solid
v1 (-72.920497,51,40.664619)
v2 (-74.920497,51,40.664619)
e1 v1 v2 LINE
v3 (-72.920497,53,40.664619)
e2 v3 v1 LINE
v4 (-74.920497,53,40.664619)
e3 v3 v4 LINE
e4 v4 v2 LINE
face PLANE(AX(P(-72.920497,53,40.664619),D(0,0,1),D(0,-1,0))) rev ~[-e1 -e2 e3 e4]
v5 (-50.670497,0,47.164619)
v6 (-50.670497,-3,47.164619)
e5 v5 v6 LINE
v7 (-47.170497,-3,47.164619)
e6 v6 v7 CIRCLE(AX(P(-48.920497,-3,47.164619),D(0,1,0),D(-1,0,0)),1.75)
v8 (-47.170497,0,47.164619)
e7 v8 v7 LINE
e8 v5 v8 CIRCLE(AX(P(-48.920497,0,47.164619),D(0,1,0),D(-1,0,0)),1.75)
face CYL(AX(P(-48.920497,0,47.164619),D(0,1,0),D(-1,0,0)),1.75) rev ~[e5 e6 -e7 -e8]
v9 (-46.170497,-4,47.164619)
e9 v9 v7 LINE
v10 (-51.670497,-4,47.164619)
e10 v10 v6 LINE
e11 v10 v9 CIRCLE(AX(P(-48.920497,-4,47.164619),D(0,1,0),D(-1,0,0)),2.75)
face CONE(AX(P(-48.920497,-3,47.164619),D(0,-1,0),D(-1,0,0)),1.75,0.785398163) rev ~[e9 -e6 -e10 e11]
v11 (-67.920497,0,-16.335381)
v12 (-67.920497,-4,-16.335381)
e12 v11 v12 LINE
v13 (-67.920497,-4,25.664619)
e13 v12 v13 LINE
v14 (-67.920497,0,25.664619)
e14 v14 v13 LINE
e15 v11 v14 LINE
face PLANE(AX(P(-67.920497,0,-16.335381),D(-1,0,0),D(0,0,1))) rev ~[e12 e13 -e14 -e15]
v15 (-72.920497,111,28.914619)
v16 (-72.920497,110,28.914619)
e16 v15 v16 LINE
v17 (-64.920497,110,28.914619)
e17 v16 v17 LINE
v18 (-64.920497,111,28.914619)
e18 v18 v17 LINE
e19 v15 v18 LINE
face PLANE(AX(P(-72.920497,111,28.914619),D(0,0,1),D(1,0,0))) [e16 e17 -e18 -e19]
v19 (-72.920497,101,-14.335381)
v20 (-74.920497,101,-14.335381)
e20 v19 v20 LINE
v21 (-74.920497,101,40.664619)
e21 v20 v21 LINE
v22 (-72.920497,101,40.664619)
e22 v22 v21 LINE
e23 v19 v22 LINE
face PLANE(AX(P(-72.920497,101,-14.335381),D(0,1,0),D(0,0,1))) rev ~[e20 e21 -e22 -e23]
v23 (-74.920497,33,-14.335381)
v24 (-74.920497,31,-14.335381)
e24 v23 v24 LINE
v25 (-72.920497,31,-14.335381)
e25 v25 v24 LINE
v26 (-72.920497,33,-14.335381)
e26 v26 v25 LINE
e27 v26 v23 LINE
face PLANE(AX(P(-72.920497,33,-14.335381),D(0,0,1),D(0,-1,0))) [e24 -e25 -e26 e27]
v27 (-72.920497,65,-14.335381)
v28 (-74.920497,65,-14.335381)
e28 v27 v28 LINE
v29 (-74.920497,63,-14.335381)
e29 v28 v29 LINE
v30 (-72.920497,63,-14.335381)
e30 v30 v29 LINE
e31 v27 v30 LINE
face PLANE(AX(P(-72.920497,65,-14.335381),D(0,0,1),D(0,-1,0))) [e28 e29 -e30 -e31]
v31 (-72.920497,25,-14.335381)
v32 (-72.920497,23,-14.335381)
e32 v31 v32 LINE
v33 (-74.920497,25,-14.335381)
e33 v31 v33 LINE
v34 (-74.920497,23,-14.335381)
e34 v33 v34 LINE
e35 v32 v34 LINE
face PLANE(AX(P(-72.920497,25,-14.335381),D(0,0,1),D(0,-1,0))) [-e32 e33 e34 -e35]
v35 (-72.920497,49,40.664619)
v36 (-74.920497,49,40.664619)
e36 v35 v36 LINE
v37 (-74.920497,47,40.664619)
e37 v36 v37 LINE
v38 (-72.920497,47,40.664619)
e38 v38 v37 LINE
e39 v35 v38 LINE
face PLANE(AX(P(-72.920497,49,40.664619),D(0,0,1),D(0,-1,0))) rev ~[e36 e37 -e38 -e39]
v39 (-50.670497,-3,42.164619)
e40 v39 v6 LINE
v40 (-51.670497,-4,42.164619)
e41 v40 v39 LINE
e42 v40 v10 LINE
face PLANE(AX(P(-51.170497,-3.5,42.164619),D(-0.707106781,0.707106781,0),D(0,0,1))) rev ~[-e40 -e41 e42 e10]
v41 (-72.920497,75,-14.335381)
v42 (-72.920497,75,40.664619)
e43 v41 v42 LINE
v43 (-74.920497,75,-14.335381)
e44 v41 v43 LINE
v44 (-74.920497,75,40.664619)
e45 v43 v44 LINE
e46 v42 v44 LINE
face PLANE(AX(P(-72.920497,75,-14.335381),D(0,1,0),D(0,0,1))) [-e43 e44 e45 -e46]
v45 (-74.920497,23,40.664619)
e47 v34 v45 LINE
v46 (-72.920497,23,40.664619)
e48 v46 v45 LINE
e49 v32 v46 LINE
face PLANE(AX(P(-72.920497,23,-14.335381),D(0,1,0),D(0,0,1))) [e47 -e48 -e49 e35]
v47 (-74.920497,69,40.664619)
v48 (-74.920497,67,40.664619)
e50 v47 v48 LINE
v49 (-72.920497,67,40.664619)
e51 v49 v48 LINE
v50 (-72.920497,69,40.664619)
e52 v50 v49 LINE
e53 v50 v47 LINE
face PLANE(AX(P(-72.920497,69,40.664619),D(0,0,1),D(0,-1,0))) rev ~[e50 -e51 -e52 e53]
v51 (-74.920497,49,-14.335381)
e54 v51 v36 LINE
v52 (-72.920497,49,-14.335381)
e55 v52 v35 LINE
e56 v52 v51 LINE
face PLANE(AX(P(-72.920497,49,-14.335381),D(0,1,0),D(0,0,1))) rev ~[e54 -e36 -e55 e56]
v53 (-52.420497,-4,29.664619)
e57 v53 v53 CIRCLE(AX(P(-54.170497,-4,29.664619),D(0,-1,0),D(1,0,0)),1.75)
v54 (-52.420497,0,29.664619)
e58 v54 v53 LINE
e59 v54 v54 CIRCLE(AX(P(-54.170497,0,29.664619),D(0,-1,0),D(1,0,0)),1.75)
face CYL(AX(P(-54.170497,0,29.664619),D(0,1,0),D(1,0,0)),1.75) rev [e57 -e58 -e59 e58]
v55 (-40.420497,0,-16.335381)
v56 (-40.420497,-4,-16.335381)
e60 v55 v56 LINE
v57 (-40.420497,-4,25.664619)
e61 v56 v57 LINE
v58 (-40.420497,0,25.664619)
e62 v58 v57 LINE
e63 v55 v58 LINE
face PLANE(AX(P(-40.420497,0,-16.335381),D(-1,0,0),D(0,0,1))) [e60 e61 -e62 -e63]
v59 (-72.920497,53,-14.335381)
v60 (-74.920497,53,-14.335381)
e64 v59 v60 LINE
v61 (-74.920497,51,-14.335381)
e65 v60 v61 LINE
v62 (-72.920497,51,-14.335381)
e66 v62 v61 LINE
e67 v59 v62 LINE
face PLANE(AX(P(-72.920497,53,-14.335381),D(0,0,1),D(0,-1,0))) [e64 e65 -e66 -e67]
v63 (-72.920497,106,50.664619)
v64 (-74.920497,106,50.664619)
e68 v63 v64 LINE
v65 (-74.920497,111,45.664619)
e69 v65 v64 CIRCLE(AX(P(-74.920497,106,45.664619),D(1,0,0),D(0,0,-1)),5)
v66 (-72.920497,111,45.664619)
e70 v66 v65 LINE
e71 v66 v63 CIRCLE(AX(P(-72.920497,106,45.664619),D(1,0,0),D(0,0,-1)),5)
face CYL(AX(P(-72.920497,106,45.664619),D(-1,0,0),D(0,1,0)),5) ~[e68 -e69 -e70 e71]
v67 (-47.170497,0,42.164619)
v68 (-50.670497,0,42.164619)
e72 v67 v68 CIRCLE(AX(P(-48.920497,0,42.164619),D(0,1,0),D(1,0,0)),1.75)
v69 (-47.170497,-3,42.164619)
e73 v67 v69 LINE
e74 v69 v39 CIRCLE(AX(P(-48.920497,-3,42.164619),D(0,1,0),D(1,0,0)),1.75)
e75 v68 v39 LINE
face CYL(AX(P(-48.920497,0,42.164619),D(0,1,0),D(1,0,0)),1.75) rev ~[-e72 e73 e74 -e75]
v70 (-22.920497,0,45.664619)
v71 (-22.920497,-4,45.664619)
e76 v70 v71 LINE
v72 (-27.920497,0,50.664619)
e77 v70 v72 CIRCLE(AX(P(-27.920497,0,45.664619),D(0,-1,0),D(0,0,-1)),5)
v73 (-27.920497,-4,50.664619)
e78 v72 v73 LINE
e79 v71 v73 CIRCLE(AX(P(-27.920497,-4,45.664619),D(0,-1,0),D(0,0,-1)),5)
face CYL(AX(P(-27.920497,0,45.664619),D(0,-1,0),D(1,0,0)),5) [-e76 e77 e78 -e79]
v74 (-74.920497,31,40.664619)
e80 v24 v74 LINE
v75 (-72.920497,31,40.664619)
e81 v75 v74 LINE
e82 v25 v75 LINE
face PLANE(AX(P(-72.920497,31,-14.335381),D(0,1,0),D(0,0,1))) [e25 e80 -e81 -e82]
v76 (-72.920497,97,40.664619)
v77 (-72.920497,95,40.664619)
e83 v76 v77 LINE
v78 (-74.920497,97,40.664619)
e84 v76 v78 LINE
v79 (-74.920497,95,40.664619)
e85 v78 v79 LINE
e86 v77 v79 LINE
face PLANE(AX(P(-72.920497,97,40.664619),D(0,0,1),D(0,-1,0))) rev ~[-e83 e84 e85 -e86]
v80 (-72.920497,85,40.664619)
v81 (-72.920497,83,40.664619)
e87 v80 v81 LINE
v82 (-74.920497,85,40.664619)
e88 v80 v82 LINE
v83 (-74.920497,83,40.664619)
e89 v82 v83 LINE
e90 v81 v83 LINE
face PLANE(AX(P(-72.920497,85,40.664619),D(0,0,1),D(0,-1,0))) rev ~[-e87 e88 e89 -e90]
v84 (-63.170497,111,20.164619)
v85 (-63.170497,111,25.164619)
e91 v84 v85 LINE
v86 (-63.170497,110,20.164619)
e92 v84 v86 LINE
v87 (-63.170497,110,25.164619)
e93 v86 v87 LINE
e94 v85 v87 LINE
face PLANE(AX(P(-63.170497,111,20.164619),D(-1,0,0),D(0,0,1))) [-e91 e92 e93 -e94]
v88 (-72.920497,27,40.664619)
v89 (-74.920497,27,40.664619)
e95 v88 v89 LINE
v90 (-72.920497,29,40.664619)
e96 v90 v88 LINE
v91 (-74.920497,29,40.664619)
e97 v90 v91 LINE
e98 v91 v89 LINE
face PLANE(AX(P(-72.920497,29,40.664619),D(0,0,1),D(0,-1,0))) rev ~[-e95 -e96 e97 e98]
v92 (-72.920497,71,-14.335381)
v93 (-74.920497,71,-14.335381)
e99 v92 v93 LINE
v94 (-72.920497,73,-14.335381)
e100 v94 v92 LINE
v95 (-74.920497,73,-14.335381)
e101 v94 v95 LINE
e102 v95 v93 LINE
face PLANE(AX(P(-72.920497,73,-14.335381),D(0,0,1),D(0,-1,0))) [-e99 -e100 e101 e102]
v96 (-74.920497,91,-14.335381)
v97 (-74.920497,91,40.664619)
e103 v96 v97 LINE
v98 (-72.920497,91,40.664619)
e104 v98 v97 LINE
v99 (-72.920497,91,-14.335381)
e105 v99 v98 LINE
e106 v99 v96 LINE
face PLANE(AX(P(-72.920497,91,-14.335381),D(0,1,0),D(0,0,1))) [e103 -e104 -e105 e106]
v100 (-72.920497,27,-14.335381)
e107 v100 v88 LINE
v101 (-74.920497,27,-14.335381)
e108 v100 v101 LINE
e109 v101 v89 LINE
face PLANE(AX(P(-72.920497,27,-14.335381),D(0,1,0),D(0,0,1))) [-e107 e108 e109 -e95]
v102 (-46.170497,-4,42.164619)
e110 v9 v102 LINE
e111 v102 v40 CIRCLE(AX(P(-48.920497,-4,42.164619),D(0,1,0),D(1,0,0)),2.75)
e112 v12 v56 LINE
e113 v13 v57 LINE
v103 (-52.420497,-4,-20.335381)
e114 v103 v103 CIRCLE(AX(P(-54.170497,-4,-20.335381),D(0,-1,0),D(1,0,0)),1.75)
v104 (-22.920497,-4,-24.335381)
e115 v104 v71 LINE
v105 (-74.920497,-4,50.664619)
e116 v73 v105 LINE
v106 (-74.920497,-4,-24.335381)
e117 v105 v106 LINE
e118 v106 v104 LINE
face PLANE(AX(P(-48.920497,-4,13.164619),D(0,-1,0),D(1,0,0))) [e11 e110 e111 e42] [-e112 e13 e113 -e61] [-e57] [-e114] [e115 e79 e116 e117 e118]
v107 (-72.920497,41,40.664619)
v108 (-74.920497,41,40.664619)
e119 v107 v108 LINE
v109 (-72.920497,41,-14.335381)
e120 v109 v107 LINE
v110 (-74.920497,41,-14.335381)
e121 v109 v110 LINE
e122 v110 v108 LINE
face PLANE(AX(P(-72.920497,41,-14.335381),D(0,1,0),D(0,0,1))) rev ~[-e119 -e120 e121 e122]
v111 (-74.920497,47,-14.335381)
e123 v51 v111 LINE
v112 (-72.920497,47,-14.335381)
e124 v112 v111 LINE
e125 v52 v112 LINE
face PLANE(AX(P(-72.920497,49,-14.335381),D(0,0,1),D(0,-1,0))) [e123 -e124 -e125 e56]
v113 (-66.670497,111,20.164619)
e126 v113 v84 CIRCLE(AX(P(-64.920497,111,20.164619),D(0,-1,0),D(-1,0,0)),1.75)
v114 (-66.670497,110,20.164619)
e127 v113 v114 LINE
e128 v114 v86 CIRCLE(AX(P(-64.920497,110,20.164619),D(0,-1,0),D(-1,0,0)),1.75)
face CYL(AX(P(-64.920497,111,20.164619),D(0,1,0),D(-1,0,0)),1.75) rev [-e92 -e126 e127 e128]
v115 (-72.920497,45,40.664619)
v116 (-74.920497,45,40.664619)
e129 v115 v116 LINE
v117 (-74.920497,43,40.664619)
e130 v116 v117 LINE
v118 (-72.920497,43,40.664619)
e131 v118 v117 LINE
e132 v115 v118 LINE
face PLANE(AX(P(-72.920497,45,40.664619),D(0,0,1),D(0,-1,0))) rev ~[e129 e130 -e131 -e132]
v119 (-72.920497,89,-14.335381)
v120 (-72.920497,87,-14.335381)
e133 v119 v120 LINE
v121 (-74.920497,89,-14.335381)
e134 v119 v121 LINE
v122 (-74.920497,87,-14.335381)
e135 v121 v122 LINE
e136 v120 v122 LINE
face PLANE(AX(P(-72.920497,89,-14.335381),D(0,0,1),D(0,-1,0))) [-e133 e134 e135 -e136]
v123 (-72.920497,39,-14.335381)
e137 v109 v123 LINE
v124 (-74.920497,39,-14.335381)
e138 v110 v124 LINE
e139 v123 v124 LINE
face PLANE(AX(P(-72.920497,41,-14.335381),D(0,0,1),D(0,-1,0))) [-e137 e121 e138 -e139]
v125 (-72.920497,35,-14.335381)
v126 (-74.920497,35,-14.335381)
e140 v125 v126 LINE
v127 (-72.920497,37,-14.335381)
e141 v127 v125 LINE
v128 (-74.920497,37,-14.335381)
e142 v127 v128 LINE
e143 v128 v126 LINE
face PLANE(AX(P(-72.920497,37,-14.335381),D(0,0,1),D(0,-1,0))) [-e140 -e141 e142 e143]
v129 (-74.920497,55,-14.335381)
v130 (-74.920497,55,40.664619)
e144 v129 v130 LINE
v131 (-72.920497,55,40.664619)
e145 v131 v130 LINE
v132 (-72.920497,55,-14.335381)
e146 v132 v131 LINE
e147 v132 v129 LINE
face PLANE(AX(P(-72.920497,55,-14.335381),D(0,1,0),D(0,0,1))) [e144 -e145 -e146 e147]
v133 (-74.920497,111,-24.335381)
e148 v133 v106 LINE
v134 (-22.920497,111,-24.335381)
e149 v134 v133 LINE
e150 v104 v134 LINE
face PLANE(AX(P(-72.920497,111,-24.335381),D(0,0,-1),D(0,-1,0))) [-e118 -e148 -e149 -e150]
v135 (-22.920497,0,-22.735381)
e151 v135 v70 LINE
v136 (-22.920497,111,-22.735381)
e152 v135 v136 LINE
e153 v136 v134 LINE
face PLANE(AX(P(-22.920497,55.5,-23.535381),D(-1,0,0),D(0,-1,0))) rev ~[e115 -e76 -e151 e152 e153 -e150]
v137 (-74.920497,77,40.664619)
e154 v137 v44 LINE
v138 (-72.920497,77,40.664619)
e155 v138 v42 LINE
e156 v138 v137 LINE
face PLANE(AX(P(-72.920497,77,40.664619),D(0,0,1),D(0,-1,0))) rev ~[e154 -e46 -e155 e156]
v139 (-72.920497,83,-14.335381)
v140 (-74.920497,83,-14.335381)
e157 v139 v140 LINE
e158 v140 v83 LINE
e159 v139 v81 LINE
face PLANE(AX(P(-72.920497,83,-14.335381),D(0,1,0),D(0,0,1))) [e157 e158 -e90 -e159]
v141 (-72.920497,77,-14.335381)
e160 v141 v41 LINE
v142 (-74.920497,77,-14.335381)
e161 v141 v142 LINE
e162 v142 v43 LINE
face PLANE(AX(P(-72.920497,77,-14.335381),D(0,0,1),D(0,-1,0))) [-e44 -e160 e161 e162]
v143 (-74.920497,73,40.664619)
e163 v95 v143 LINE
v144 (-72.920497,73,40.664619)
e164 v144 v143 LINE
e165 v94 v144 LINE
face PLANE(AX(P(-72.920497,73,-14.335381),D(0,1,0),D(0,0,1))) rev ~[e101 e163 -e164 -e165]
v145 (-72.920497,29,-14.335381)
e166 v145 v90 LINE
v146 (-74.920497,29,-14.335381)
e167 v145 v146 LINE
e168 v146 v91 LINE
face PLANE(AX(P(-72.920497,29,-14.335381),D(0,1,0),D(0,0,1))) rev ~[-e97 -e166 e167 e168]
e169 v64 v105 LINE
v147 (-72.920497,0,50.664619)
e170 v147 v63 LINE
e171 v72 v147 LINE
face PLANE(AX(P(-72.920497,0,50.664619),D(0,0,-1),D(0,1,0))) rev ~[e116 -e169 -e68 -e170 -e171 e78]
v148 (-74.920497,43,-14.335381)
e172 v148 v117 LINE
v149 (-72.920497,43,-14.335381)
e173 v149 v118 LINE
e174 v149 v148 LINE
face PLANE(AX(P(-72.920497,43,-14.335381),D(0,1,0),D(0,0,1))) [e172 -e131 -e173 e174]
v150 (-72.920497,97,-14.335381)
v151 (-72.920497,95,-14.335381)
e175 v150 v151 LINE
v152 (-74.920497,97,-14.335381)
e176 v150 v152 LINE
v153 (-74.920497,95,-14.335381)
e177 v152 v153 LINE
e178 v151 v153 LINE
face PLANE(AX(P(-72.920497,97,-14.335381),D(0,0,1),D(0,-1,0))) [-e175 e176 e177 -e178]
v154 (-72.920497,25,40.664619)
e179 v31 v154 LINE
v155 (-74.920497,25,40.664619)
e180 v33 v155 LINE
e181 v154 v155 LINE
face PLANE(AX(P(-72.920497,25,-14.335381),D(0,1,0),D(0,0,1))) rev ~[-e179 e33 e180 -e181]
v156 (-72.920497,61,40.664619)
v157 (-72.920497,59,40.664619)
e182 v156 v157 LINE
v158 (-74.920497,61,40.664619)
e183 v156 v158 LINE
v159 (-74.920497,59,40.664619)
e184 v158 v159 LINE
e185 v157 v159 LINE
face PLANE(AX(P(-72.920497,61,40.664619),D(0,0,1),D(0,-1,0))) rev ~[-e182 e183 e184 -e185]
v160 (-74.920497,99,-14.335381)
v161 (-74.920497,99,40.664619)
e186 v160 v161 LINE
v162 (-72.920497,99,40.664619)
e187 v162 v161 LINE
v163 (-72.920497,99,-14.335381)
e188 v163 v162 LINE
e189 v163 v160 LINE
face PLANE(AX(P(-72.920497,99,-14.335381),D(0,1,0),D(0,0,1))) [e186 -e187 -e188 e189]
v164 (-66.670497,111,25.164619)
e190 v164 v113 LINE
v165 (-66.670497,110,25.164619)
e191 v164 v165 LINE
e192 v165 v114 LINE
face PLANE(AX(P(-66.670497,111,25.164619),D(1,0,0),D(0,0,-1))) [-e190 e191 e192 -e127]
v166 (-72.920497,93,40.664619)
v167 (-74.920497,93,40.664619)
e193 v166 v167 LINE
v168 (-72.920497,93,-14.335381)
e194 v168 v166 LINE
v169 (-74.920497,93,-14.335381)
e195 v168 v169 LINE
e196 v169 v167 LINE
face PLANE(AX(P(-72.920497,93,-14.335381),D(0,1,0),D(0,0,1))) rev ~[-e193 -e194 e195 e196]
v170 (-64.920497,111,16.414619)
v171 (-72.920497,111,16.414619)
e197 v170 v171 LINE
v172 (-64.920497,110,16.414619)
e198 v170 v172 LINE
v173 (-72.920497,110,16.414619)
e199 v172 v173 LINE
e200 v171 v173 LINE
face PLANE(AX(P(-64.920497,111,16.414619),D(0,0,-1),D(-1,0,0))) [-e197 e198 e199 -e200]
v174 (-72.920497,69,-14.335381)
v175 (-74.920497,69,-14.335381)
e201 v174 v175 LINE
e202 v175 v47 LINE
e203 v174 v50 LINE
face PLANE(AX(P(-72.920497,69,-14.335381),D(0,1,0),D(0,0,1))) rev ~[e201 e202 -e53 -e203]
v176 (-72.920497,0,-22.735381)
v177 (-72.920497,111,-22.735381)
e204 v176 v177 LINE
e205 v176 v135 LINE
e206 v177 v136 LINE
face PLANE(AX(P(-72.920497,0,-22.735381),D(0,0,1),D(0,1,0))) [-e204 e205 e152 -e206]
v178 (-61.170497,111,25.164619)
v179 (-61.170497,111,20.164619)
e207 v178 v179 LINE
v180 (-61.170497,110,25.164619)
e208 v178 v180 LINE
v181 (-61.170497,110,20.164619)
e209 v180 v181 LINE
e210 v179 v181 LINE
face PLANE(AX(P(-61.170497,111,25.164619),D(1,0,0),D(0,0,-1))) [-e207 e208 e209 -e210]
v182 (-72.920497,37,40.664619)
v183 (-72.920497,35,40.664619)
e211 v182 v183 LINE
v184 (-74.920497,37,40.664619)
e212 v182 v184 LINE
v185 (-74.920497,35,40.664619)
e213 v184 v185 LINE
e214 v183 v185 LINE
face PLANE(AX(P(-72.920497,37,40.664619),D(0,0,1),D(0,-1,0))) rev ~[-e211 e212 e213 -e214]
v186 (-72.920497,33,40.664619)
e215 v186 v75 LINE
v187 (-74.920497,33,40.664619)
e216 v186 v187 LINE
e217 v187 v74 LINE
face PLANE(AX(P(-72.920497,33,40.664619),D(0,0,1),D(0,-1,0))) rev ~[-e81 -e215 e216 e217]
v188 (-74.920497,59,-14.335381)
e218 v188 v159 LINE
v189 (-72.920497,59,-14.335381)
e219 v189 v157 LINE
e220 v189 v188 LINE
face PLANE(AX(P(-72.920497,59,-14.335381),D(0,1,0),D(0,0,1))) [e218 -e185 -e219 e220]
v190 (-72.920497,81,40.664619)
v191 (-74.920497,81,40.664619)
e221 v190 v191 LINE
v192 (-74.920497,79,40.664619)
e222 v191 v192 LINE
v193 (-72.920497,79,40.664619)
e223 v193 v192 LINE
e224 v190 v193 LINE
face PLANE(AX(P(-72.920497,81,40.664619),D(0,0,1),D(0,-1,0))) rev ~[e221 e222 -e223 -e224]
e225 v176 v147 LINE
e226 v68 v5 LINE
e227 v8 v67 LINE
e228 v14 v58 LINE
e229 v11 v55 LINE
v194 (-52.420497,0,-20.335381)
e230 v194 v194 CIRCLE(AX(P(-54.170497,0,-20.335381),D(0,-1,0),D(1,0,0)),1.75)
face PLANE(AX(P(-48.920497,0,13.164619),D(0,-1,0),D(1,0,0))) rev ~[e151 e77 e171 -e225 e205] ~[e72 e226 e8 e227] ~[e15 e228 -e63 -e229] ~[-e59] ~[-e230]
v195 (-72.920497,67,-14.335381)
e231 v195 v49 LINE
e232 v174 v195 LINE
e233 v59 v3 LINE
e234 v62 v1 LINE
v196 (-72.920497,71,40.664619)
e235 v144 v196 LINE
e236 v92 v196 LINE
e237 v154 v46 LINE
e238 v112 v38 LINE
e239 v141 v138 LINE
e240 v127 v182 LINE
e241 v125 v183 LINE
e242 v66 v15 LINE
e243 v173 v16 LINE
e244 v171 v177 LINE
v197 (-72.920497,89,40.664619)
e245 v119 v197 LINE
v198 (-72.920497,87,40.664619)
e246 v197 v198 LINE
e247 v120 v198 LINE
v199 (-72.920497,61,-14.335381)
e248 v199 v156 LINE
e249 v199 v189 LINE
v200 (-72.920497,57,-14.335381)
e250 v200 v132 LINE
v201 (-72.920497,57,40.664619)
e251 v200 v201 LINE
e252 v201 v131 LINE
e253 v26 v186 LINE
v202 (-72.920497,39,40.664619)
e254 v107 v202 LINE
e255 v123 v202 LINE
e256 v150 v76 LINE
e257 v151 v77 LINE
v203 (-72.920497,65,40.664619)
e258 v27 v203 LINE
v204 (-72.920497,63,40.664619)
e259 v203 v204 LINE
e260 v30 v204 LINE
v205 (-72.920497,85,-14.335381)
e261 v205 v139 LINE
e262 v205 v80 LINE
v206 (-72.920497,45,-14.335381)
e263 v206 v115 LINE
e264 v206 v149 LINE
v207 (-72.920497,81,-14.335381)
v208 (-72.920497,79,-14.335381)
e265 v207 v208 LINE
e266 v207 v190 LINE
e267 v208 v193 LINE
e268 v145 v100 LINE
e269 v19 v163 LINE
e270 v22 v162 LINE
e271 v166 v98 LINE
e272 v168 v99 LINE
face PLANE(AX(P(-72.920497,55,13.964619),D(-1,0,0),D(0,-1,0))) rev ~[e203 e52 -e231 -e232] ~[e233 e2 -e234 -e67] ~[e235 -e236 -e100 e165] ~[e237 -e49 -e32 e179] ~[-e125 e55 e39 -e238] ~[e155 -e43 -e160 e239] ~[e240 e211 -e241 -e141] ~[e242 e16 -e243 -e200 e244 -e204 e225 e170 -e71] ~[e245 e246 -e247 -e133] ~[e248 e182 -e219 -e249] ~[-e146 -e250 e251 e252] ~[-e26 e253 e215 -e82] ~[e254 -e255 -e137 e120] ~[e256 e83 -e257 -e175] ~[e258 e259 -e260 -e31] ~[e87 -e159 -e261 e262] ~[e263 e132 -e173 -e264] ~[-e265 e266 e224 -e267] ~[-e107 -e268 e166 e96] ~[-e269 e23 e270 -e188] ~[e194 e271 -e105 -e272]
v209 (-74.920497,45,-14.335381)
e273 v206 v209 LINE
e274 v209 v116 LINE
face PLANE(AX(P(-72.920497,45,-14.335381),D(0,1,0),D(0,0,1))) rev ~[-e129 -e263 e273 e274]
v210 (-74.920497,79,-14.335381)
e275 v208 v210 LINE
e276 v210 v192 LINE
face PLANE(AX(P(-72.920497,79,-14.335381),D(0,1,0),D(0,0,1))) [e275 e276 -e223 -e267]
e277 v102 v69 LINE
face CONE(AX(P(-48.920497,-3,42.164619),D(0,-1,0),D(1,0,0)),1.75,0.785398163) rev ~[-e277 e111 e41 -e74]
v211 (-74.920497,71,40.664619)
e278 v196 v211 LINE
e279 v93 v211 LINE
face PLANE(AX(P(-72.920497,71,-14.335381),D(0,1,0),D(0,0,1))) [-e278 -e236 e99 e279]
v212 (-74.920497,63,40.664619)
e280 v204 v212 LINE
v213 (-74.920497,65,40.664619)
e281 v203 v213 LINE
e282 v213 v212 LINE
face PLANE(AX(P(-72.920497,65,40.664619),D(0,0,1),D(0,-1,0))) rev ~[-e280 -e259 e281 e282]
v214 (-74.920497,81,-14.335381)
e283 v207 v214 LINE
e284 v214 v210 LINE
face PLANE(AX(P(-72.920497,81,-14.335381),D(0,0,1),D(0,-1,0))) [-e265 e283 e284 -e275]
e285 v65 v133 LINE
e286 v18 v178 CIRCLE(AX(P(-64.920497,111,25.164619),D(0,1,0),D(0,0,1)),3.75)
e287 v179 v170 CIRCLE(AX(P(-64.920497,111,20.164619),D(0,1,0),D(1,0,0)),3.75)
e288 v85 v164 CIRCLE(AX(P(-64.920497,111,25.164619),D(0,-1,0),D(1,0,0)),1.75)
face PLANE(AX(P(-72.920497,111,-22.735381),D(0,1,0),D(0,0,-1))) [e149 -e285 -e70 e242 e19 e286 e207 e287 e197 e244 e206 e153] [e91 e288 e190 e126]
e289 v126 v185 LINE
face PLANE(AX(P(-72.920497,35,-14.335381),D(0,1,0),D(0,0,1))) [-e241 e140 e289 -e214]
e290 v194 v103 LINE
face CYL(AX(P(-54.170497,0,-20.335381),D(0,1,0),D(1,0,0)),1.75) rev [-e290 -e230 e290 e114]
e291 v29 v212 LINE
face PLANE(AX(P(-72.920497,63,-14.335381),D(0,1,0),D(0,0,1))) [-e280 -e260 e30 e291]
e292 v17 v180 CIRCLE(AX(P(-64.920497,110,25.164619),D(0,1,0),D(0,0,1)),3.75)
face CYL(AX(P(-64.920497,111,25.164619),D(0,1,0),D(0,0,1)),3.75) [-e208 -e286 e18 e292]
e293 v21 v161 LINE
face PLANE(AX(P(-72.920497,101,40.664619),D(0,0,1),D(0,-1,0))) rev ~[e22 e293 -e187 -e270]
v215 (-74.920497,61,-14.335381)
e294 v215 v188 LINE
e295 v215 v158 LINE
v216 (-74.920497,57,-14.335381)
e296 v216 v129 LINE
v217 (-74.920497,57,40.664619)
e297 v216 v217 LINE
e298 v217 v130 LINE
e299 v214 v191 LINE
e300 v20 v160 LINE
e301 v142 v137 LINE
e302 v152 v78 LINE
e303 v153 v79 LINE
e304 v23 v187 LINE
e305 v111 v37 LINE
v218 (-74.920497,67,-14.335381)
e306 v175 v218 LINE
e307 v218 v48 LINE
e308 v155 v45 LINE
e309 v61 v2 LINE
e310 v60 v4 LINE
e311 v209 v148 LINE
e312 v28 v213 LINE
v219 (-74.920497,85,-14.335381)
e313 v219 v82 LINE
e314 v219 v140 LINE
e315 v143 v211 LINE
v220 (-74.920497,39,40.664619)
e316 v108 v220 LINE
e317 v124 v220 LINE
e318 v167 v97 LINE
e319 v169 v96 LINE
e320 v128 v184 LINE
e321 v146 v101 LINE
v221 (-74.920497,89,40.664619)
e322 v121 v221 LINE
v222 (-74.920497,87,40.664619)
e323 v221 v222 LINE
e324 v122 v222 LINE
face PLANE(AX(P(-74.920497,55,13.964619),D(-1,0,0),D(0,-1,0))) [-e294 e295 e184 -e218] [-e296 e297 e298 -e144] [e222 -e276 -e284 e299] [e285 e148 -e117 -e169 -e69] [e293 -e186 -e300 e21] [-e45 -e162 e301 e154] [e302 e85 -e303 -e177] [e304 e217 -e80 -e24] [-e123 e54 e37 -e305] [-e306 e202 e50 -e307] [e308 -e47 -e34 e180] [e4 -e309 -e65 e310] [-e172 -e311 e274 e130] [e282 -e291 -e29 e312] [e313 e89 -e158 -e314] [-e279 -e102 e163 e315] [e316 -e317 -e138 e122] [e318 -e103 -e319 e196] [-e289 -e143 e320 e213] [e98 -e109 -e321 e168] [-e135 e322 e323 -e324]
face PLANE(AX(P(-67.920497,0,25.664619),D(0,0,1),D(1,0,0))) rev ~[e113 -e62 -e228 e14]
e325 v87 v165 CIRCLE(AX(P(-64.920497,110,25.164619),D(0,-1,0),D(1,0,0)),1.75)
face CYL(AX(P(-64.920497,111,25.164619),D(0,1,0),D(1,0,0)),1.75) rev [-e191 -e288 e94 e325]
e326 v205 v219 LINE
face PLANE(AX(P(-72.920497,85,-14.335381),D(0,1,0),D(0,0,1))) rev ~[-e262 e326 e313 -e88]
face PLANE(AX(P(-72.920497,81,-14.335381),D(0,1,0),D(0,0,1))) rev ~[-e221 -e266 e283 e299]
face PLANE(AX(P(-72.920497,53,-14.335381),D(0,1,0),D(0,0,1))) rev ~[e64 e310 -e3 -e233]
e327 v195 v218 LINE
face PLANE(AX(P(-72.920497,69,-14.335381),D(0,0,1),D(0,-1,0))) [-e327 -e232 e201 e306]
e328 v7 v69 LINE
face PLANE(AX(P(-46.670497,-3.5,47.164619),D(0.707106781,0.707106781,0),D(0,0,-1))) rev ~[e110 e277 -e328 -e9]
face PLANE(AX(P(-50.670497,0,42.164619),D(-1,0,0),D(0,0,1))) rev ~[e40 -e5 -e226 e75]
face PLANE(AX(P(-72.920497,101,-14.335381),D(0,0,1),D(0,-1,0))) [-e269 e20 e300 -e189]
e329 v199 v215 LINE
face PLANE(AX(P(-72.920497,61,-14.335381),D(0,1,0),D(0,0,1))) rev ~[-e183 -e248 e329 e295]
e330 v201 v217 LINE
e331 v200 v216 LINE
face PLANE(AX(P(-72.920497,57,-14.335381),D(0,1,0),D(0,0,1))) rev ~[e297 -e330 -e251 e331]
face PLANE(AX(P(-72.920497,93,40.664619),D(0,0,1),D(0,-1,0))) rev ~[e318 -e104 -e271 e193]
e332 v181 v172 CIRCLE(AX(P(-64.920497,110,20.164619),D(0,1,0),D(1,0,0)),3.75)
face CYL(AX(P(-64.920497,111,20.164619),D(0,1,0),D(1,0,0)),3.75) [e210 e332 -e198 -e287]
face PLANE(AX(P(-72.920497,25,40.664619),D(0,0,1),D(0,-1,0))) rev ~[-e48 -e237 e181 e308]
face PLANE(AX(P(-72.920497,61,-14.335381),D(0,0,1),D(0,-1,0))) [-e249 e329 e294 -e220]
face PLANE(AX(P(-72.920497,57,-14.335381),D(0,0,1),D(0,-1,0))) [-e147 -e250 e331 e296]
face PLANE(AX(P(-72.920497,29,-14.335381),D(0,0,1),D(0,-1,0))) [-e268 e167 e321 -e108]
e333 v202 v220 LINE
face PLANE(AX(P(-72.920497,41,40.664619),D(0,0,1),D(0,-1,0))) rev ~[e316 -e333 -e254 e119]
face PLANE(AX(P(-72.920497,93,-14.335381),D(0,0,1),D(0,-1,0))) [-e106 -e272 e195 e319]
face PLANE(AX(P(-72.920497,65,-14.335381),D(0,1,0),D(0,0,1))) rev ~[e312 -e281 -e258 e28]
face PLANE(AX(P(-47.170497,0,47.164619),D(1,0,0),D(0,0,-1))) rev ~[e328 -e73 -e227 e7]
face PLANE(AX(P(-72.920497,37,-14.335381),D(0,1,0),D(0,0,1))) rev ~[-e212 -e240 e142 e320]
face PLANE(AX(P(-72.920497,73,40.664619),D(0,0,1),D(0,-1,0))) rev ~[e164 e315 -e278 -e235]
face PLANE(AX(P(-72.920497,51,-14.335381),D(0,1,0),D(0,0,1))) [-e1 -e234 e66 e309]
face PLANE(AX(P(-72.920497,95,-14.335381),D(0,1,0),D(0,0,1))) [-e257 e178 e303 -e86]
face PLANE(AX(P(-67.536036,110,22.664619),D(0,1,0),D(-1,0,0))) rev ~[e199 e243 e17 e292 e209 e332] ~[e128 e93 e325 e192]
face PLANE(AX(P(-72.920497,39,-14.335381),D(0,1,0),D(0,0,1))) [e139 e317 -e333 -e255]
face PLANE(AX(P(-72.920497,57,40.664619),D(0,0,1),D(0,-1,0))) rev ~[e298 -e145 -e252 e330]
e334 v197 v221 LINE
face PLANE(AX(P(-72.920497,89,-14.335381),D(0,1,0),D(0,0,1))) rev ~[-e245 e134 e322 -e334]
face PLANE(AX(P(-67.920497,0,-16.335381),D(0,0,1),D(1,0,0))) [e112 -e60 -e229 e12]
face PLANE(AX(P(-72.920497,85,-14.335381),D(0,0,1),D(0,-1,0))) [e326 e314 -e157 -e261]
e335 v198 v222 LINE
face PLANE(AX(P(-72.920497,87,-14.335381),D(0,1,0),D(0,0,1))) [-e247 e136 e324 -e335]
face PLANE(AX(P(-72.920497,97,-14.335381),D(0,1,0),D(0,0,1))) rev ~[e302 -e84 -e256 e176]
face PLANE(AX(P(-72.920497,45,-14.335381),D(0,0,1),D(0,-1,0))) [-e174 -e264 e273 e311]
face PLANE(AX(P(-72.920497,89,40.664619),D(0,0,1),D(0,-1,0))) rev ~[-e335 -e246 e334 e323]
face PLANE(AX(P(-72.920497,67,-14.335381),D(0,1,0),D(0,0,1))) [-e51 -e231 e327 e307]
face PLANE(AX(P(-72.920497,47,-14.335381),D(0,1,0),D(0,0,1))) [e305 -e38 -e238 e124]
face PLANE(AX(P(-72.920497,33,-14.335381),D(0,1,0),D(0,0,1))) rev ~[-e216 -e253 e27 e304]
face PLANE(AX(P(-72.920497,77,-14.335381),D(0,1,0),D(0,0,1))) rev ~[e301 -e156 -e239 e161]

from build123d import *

# Parameters (mm, degrees)
F0_R     = 1.75
F0_W     = 27.5
F0_H     = 42
F1_DEPTH = 4
F3_W     = 110
F3_H     = 73.4
F3_W_2   = 2
F3_H_2   = 55
F3_W_3   = 1
F4_DEPTH = 2
F5_SIZE  = 1
F6_DEPTH = 50
F9_DEPTH = 1
F10_R    = 5


# Not quite as in the source:
# - a feature names something its author has since deleted; it is built from what else it names


with BuildPart() as f1:
    # F0 (on Front) → F1 (new body)
    with BuildSketch(Plane.XZ):
        Polygon((-22.9204972982, 50.6646189876), (-72.9204972982, 50.6646189876), (-74.9204972982, 50.6646189876), (-74.9204972982, -24.3353810124), (-72.9204972982, -24.3353810124), (-22.9204972982, -24.3353810124), align=None)
        with Locations((-54.1704972982, -20.3353810124)):
            Circle(F0_R, mode=Mode.SUBTRACT)
        with Locations((-54.1704972982, 4.6646189876)):
            Rectangle(F0_W, F0_H, mode=Mode.SUBTRACT)
        with Locations((-54.1704972982, 29.6646189876)):
            Circle(F0_R, mode=Mode.SUBTRACT)
        with BuildLine():
            Line((-50.6704972982, 42.1646189876), (-50.6704972982, 47.1646189876))
            ThreePointArc((-50.6704972982, 47.1646189876), (-48.9204972982, 48.9146189876), (-47.1704972982, 47.1646189876))
            Line((-47.1704972982, 47.1646189876), (-47.1704972982, 42.1646189876))
            ThreePointArc((-47.1704972982, 42.1646189876), (-48.9204972982, 40.4146189876), (-50.6704972982, 42.1646189876))
        make_face(mode=Mode.SUBTRACT)
    extrude(amount=F1_DEPTH)

    # F3 (on line) → F4 (join, through all)
    with BuildSketch(Plane(origin=(-72.9204972982, 0, 0), x_dir=(0, -1, 0), z_dir=(-1, 0, 0))):
        with Locations((-55, 13.9646189876)):
            Rectangle(F3_W, F3_H)
        with Locations((-100, 13.1646189876)):
            Rectangle(F3_W_2, F3_H_2, mode=Mode.SUBTRACT)
        with Locations((-96, 13.1646189876)):
            Rectangle(F3_W_2, F3_H_2, mode=Mode.SUBTRACT)
        with Locations((-92, 13.1646189876)):
            Rectangle(F3_W_2, F3_H_2, mode=Mode.SUBTRACT)
        with Locations((-88, 13.1646189876)):
            Rectangle(F3_W_2, F3_H_2, mode=Mode.SUBTRACT)
        with Locations((-84, 13.1646189876)):
            Rectangle(F3_W_2, F3_H_2, mode=Mode.SUBTRACT)
        with Locations((-80, 13.1646189876)):
            Rectangle(F3_W_2, F3_H_2, mode=Mode.SUBTRACT)
        with Locations((-76, 13.1646189876)):
            Rectangle(F3_W_2, F3_H_2, mode=Mode.SUBTRACT)
        with Locations((-72, 13.1646189876)):
            Rectangle(F3_W_2, F3_H_2, mode=Mode.SUBTRACT)
        with Locations((-68, 13.1646189876)):
            Rectangle(F3_W_2, F3_H_2, mode=Mode.SUBTRACT)
        with Locations((-64, 13.1646189876)):
            Rectangle(F3_W_2, F3_H_2, mode=Mode.SUBTRACT)
        with Locations((-60, 13.1646189876)):
            Rectangle(F3_W_2, F3_H_2, mode=Mode.SUBTRACT)
        with Locations((-56, 13.1646189876)):
            Rectangle(F3_W_2, F3_H_2, mode=Mode.SUBTRACT)
        with Locations((-52, 13.1646189876)):
            Rectangle(F3_W_2, F3_H_2, mode=Mode.SUBTRACT)
        with Locations((-48, 13.1646189876)):
            Rectangle(F3_W_2, F3_H_2, mode=Mode.SUBTRACT)
        with Locations((-44, 13.1646189876)):
            Rectangle(F3_W_2, F3_H_2, mode=Mode.SUBTRACT)
        with Locations((-40, 13.1646189876)):
            Rectangle(F3_W_2, F3_H_2, mode=Mode.SUBTRACT)
        with Locations((-36, 13.1646189876)):
            Rectangle(F3_W_2, F3_H_2, mode=Mode.SUBTRACT)
        with Locations((-32, 13.1646189876)):
            Rectangle(F3_W_2, F3_H_2, mode=Mode.SUBTRACT)
        with Locations((-28, 13.1646189876)):
            Rectangle(F3_W_2, F3_H_2, mode=Mode.SUBTRACT)
        with Locations((-24, 13.1646189876)):
            Rectangle(F3_W_2, F3_H_2, mode=Mode.SUBTRACT)
        with Locations((-110.5, 13.9646189876)):
            Rectangle(F3_W_3, F3_H)
        Polygon((0, -24.3353810124), (0, -22.7353810124), (-110, -22.7353810124), (-111, -22.7353810124), (-111, -24.3353810124), align=None)
    extrude(amount=F4_DEPTH)

    # F5
    f5_edges = [f1.edges().sort_by_distance(p)[0] for p in [
        (-47.170497, -4, 44.664619),
    ]]
    chamfer(f5_edges, length=F5_SIZE)

    # F3 (on line) → F6 (join, through all)
    with BuildSketch(Plane(origin=(-72.9204972982, 0, 0), x_dir=(0, -1, 0), z_dir=(-1, 0, 0))):
        Polygon((0, -24.3353810124), (0, -22.7353810124), (-110, -22.7353810124), (-111, -22.7353810124), (-111, -24.3353810124), align=None)
    extrude(amount=-F6_DEPTH)

    # F8 (on line) → F9 (join, through all)
    with BuildSketch(Plane(origin=(0, 111, 0), x_dir=(-1, 0, 0), z_dir=(0, 1, 0))):
        with BuildLine():
            Line((64.9204972982, 16.4146189876), (72.9204972982, 16.4146189876))
            Line((72.9204972982, 16.4146189876), (72.9204972982, 28.9146189876))
            Line((72.9204972982, 28.9146189876), (64.9204972982, 28.9146189876))
            ThreePointArc((64.9204972982, 28.9146189876), (62.2688468688, 27.816269417), (61.1704972982, 25.1646189876))
            Line((61.1704972982, 25.1646189876), (61.1704972982, 20.1646189876))
            ThreePointArc((61.1704972982, 20.1646189876), (62.2688468688, 17.5129685581), (64.9204972982, 16.4146189876))
        make_face()
        with BuildLine():
            Line((63.1704972982, 20.1646189876), (63.1704972982, 25.1646189876))
            ThreePointArc((63.1704972982, 25.1646189876), (64.9204972982, 26.9146189876), (66.6704972982, 25.1646189876))
            Line((66.6704972982, 25.1646189876), (66.6704972982, 20.1646189876))
            ThreePointArc((66.6704972982, 20.1646189876), (64.9204972982, 18.4146189876), (63.1704972982, 20.1646189876))
        make_face(mode=Mode.SUBTRACT)
    extrude(amount=-F9_DEPTH)

    # F10
    f10_edges = [f1.edges().sort_by_distance(p)[0] for p in [
        (-22.920497, -2, 50.664619),
        (-73.920497, 111, 50.664619),
    ]]
    fillet(f10_edges, radius=F10_R)


solid = f1.part
